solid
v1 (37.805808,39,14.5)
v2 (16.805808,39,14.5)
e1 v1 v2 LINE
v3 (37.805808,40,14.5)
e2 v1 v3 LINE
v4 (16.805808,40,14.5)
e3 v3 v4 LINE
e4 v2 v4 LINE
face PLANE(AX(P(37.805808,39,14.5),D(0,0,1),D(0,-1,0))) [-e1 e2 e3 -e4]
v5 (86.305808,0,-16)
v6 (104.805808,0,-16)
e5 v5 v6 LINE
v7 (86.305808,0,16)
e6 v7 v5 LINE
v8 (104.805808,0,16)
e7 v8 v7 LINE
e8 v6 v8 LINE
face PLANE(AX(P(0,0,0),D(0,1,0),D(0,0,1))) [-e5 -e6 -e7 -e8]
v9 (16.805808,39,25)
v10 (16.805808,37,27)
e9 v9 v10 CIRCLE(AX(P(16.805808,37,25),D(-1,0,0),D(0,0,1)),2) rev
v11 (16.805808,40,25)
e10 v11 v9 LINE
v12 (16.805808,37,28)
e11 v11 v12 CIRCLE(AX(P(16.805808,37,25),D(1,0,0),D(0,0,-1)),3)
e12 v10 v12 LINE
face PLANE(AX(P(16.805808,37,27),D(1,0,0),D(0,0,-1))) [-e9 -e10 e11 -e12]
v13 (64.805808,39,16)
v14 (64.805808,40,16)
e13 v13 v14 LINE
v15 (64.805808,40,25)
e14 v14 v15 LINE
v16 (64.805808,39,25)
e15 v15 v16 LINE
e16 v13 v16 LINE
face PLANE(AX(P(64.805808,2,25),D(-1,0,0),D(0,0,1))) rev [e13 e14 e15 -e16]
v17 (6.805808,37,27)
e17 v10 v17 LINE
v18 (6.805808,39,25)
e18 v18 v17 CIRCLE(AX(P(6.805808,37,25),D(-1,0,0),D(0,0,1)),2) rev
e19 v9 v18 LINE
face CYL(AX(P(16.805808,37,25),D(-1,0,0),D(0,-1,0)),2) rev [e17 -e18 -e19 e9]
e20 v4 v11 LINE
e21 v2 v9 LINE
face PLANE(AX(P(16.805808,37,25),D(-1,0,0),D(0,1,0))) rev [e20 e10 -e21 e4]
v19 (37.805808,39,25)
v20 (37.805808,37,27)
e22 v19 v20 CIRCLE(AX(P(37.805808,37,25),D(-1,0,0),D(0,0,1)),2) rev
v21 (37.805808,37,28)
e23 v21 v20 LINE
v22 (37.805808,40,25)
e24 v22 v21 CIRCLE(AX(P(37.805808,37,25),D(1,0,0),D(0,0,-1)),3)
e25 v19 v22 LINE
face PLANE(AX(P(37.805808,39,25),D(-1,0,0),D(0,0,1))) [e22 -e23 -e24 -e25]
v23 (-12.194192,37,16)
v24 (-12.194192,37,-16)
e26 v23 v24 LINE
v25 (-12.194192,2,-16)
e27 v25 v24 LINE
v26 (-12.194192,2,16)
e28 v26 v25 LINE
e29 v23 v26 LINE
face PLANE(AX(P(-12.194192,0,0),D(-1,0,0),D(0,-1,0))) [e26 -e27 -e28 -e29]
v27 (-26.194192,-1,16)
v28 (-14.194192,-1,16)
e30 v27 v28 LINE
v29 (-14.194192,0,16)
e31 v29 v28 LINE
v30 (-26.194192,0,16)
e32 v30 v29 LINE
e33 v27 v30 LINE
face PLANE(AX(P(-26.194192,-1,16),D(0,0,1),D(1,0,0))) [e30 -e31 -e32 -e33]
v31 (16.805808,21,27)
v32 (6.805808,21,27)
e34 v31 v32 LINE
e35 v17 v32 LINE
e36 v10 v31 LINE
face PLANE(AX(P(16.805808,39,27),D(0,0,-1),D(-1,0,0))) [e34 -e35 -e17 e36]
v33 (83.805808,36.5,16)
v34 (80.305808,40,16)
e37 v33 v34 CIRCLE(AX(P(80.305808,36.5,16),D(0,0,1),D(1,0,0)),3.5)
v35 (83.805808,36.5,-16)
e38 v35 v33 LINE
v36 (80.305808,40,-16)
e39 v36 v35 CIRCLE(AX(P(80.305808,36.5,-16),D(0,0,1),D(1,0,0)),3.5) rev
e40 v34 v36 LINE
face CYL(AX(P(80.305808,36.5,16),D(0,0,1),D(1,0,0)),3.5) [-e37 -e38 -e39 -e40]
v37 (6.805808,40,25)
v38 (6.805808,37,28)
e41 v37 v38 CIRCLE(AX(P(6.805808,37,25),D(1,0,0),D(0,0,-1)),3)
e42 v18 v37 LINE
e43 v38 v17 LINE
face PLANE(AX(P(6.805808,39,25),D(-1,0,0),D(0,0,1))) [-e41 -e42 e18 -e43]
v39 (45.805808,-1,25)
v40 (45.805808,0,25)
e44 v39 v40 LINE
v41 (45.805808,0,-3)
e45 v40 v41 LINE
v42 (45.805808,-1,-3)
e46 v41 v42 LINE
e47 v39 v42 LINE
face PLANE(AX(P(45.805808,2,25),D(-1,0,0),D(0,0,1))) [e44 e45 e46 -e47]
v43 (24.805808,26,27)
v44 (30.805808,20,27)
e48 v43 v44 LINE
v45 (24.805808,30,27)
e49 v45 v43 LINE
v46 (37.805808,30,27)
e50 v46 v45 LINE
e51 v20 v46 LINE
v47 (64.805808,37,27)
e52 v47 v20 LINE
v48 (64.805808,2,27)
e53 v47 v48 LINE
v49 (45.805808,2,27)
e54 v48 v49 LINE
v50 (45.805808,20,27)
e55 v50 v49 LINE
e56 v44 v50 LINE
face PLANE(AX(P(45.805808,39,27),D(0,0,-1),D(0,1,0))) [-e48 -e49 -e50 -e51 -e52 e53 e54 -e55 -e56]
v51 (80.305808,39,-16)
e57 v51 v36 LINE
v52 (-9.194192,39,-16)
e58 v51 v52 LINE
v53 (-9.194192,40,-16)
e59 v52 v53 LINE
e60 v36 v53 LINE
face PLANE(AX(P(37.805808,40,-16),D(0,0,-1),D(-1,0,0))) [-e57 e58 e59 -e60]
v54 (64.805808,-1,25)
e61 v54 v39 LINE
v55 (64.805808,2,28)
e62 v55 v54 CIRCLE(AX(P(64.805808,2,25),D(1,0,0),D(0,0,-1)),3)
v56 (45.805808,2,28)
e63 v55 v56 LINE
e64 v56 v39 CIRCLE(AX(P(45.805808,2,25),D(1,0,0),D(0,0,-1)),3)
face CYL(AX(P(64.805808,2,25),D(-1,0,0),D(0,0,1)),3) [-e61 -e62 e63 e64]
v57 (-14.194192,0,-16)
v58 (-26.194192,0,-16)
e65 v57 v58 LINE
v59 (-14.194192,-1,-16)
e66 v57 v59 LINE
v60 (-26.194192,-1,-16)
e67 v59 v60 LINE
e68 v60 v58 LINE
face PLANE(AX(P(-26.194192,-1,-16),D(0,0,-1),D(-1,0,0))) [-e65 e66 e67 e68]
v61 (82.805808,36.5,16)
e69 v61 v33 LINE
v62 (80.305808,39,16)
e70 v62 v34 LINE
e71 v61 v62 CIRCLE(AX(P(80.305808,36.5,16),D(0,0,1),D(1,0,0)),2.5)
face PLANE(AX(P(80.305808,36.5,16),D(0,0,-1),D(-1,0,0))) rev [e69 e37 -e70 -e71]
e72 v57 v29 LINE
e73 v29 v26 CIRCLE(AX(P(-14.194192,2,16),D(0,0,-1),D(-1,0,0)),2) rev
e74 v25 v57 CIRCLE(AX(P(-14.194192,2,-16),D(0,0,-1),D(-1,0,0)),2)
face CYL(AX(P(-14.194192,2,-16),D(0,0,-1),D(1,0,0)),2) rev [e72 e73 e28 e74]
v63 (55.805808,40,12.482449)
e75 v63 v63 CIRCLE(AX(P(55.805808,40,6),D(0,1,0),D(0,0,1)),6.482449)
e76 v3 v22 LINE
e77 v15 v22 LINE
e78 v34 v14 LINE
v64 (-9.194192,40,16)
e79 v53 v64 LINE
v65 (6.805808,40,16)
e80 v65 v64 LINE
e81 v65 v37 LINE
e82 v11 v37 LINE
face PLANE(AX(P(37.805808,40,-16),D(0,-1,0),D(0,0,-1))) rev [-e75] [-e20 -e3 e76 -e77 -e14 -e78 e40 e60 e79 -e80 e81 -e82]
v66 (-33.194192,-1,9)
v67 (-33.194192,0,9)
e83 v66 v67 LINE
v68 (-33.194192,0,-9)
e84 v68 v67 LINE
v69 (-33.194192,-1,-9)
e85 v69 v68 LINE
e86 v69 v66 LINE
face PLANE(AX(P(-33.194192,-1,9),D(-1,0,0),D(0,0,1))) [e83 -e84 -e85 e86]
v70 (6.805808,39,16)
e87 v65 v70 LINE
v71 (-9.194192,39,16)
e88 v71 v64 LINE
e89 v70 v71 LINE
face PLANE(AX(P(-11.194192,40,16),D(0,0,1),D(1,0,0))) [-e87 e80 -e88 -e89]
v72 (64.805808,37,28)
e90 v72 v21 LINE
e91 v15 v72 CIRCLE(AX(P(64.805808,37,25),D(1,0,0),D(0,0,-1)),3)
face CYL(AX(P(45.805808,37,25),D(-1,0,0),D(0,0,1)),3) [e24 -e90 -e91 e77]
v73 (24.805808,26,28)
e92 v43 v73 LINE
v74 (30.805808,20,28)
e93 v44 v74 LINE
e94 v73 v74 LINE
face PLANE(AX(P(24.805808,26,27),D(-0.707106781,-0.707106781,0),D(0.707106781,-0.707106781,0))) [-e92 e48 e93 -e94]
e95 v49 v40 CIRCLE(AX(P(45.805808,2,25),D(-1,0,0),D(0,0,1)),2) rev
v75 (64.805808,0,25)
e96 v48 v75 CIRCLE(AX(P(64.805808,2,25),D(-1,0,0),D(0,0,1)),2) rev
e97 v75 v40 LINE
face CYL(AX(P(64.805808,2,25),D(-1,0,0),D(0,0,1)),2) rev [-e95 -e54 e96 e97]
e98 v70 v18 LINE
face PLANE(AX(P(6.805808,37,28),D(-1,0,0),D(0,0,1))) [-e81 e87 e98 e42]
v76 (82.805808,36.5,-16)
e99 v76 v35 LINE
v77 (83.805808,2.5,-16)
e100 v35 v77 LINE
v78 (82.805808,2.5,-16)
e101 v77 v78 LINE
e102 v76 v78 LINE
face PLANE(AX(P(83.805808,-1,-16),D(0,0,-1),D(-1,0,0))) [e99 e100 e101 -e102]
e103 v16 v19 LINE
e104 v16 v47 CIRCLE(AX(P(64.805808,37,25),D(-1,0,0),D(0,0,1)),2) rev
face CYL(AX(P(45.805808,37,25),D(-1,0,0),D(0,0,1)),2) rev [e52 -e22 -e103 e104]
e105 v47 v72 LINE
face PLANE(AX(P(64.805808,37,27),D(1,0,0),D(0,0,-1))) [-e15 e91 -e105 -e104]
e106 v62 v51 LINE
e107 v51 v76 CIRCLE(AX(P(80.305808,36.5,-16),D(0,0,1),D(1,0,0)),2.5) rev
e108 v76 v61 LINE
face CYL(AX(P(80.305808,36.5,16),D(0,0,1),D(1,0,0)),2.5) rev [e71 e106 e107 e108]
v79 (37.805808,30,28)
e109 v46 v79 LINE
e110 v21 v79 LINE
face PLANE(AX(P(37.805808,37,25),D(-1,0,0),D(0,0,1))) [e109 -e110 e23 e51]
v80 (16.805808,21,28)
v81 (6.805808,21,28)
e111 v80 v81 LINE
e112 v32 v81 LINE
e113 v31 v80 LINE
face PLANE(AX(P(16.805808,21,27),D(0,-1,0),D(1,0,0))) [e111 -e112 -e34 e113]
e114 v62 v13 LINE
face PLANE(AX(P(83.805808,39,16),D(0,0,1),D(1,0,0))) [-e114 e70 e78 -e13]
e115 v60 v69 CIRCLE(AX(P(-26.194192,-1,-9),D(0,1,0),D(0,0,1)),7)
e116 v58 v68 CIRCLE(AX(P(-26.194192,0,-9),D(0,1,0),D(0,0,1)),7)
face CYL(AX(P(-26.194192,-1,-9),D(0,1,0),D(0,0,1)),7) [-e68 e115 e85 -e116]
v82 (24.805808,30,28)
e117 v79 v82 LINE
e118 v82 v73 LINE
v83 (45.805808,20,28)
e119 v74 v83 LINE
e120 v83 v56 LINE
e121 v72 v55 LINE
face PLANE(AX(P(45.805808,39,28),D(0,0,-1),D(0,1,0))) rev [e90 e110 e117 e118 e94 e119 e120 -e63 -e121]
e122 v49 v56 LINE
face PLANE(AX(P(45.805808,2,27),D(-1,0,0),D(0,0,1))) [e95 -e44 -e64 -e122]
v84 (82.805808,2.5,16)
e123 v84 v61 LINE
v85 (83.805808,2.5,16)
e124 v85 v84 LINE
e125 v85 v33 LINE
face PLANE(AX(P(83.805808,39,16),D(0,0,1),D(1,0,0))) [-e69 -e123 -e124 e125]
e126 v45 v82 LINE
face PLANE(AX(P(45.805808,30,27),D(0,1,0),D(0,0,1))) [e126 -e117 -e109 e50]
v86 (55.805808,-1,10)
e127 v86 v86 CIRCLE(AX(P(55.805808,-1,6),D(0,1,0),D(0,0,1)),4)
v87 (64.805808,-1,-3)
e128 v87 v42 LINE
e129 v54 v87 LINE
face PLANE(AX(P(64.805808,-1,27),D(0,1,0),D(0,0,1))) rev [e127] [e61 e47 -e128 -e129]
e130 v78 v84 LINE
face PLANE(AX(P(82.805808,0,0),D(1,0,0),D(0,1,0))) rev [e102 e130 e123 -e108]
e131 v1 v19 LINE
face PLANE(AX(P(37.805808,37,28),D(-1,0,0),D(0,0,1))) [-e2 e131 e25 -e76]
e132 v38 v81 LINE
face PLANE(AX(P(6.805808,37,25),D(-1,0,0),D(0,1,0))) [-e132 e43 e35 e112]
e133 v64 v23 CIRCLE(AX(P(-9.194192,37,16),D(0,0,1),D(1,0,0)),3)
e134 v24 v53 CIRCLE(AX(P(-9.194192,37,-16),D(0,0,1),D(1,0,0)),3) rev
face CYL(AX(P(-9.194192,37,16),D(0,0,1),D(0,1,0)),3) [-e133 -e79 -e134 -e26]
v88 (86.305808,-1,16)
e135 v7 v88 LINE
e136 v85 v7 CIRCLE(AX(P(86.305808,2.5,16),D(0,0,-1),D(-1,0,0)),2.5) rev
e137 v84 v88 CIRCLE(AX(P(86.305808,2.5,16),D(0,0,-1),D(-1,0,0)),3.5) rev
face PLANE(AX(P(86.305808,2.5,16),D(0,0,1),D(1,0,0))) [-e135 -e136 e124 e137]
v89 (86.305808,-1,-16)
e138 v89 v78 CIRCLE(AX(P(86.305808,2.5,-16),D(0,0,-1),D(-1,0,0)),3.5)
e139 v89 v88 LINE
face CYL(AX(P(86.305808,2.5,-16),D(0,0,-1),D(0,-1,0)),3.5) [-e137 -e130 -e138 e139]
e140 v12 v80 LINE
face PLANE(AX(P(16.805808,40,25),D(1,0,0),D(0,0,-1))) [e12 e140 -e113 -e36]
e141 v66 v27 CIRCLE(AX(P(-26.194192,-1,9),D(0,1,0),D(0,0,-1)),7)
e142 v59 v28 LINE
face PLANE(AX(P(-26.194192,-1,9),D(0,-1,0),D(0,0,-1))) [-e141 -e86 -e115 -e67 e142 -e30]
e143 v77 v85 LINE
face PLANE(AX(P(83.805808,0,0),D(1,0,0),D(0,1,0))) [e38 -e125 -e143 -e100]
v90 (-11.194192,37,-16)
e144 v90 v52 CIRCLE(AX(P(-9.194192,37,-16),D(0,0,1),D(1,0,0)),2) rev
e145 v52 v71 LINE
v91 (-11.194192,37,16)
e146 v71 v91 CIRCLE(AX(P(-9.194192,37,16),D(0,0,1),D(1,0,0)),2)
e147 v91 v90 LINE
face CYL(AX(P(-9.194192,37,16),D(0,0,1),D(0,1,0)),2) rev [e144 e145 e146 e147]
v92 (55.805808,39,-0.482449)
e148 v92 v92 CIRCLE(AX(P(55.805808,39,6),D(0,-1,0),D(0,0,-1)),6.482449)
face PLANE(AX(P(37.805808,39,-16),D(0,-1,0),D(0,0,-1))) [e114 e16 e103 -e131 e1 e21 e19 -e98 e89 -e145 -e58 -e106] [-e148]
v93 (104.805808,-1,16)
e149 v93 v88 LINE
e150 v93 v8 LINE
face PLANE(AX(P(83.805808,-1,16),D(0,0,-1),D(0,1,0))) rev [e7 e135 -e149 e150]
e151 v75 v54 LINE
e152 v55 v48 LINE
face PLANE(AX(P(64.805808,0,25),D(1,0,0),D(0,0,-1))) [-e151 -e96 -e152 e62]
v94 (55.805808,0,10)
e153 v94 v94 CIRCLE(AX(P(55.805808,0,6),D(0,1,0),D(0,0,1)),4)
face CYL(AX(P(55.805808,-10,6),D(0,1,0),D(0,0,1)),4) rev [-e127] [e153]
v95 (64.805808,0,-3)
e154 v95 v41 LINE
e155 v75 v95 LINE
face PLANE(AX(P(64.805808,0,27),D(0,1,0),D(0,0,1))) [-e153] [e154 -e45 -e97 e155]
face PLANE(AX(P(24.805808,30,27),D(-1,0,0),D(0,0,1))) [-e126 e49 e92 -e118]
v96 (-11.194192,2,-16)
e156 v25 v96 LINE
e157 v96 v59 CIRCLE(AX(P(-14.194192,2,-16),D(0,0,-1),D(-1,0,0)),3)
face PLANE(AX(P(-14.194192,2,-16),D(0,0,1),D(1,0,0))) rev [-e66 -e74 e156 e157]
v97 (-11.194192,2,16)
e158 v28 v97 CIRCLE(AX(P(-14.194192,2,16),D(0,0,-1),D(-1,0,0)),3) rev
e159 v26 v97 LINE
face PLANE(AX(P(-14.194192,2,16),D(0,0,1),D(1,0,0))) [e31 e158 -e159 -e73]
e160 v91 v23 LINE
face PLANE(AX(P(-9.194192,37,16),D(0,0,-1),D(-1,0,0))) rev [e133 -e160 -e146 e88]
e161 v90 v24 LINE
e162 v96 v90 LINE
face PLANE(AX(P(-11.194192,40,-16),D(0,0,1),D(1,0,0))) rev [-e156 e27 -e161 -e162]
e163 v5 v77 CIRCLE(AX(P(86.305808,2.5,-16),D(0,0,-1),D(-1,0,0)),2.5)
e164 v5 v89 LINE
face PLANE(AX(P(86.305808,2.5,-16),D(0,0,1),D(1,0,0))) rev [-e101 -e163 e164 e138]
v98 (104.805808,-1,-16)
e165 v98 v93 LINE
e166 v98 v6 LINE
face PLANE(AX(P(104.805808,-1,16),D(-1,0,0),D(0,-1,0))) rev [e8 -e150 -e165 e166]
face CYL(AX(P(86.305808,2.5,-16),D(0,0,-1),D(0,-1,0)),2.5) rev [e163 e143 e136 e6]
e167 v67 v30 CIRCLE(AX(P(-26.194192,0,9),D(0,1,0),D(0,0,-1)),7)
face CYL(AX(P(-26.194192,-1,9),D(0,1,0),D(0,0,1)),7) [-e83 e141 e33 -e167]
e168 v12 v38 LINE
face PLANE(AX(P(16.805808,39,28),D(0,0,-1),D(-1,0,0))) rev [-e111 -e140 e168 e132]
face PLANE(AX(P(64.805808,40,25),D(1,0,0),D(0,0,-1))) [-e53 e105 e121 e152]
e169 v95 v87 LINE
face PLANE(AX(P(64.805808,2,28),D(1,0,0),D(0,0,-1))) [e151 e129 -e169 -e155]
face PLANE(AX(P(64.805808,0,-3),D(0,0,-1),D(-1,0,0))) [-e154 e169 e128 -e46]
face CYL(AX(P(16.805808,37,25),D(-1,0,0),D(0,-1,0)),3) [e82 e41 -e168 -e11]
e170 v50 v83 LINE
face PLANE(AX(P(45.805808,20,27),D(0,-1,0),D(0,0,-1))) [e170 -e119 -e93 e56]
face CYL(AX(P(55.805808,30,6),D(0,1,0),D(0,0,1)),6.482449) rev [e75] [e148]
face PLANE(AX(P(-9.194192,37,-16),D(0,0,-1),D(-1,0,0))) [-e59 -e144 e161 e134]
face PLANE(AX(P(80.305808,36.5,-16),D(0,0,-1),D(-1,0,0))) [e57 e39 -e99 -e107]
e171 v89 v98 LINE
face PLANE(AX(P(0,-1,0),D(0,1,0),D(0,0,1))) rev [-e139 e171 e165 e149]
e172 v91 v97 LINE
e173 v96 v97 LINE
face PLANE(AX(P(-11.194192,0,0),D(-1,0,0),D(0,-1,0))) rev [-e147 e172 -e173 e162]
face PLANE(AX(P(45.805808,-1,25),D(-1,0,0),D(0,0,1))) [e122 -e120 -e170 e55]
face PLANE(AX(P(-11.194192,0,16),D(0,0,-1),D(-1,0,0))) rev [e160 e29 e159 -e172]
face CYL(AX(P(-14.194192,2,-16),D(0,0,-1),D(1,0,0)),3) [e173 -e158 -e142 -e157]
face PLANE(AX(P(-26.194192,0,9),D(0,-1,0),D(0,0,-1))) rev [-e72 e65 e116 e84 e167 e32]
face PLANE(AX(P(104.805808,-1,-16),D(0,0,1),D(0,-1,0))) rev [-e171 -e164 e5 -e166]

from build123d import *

# Parameters (mm, degrees)
BASE_FLANGE1_DEPTH           = 1
EDGE_FLANGE2_STRIP_W         = 8
EDGE_FLANGE2_STRIP_H         = 1
EDGE_FLANGE2_STRIP_CUT_DEPTH = 32
EDGE_FLANGE2_DEPTH           = 32
EDGE_FLANGE3_STRIP_W         = 8
EDGE_FLANGE3_STRIP_H         = 1
EDGE_FLANGE3_STRIP_CUT_DEPTH = 32
EDGE_FLANGE3_DEPTH           = 32
BASE_FLANGE2_DEPTH           = 10
SKETCH28_W                   = 30.5
SKETCH28_H                   = 1
BASE_FLANGE3_DEPTH           = 21
BASE_FLANGE4_DEPTH           = 8
TAB1_DEPTH                   = 1
BASE_FLANGE5_DEPTH           = 19
SKETCH41_W                   = 32
SKETCH41_H                   = 1
BASE_FLANGE6_DEPTH           = 19
EDGE_FLANGE4_STRIP_W         = 9
EDGE_FLANGE4_STRIP_H         = 1
EDGE_FLANGE4_STRIP_CUT_DEPTH = 32
EDGE_FLANGE4_DEPTH           = 32
EDGE_FLANGE5_STRIP_W         = 9
EDGE_FLANGE5_STRIP_H         = 1
EDGE_FLANGE5_STRIP_CUT_DEPTH = 32
EDGE_FLANGE5_DEPTH           = 32
SKETCH52_R                   = 6.482448702
CUT_EXTRUDE1_DEPTH           = 10
SKETCH53_R                   = 4
CUT_EXTRUDE2_DEPTH           = 10


# Read off the part's stored shape, not the designer's step: Base-Flange2
# Sheet-metal steps are written as plain solids
with BuildPart() as part:
    # Sketch1 → Base-Flange1 (new body)
    with BuildSketch(Plane(origin=(0, 0, 0), x_dir=(1, 0, 0), z_dir=(0, 1, 0))):
        with BuildLine():
            Line((-33.194191811, -9), (-33.194191811, 9))
            ThreePointArc((-33.194191811, 9), (-31.14393928, 13.949747468), (-26.194191811, 16))
            Line((-26.194191811, 16), (-11.194191811, 16))
            Line((-11.194191811, 16), (-11.194191811, -16))
            Line((-11.194191811, -16), (-26.194191811, -16))
            ThreePointArc((-26.194191811, -16), (-31.14393928, -13.949747468), (-33.194191811, -9))
        make_face()
    extrude(amount=-BASE_FLANGE1_DEPTH)

    # Edge-Flange2 strip (across the edge) → Edge-Flange2 strip cut (cut)
    with BuildSketch(Plane(origin=(-11.194191811, 0, 16), x_dir=(-1, 0, 0), z_dir=(0, 0, -1))):
        with Locations((-1, -0.5)):
            Rectangle(EDGE_FLANGE2_STRIP_W, EDGE_FLANGE2_STRIP_H)
    extrude(amount=EDGE_FLANGE2_STRIP_CUT_DEPTH, mode=Mode.SUBTRACT)

    # Edge-Flange2 section (across the edge) → Edge-Flange2 (add)
    with BuildSketch(Plane(origin=(-11.194191811, 0, 16), x_dir=(-1, 0, 0), z_dir=(0, 0, -1))):
        with BuildLine():
            Line((0, 2), (0, 40))
            Line((0, 40), (1, 40))
            Line((1, 40), (1, 2))
            ThreePointArc((1, 2), (1.585786438, 0.585786438), (3, 0))
            Line((3, 0), (3, -1))
            ThreePointArc((3, -1), (0.878679656, -0.121320344), (0, 2))
        make_face()
    extrude(amount=EDGE_FLANGE2_DEPTH)

    # Edge-Flange3 strip (across the edge) → Edge-Flange3 strip cut (cut)
    with BuildSketch(Plane(origin=(-11.194191811, 40, -16), x_dir=(0, -1, 0), z_dir=(0, 0, 1))):
        with Locations((-1, -0.5)):
            Rectangle(EDGE_FLANGE3_STRIP_W, EDGE_FLANGE3_STRIP_H)
    extrude(amount=EDGE_FLANGE3_STRIP_CUT_DEPTH, mode=Mode.SUBTRACT)

    # Edge-Flange3 section (across the edge) → Edge-Flange3 (add)
    with BuildSketch(Plane(origin=(-11.194191811, 40, -16), x_dir=(0, -1, 0), z_dir=(0, 0, 1))):
        with BuildLine():
            Line((0, 2), (0, 18))
            Line((0, 18), (1, 18))
            Line((1, 18), (1, 2))
            ThreePointArc((1, 2), (1.585786438, 0.585786438), (3, 0))
            Line((3, 0), (3, -1))
            ThreePointArc((3, -1), (0.878679656, -0.121320344), (0, 2))
        make_face()
    extrude(amount=EDGE_FLANGE3_DEPTH)


with BuildPart() as body_2:
    # Base-Flange2 outline → Base-Flange2 (new body)
    with BuildSketch(Plane(origin=(6.805808189, 0, 0), x_dir=(0, 0, -1), z_dir=(1, 0, 0))):
        with BuildLine():
            Line((-28, 37), (-28, 21))
            Line((-28, 21), (-27, 21))
            Line((-27, 21), (-27, 37))
            ThreePointArc((-27, 37), (-26.414213562, 38.414213562), (-25, 39))
            Line((-25, 39), (16, 39))
            Line((16, 39), (16, 40))
            Line((16, 40), (-25, 40))
            ThreePointArc((-25, 40), (-27.121320344, 39.121320344), (-28, 37))
        make_face()
    extrude(amount=BASE_FLANGE2_DEPTH)


with BuildPart() as part_1:
    add(part.part)

    # Combine1: union body 2
    add(body_2.part)


with BuildPart() as body_2_2:
    # Sketch28 → Base-Flange3 (new body)
    with BuildSketch(Plane(origin=(16.805808189, 0, 0), x_dir=(0, 0, -1), z_dir=(1, 0, 0))):
        with Locations((0.75, 39.5)):
            Rectangle(SKETCH28_W, SKETCH28_H)
    extrude(amount=BASE_FLANGE3_DEPTH)


with BuildPart() as body_3:
    # Sketch31 → Base-Flange4 (new body)
    with BuildSketch(Plane(origin=(37.805808189, 0, 0), x_dir=(0, 0, -1), z_dir=(1, 0, 0))):
        with BuildLine():
            Line((16, 39), (-25, 39))
            ThreePointArc((-25, 39), (-26.414213562, 38.414213562), (-27, 37))
            Line((-27, 37), (-27, 30))
            Line((-27, 30), (-28, 30))
            Line((-28, 30), (-28, 37))
            ThreePointArc((-28, 37), (-27.121320344, 39.121320344), (-25, 40))
            Line((-25, 40), (16, 40))
            Line((16, 40), (16, 39))
        make_face()
    extrude(amount=BASE_FLANGE4_DEPTH)

    # Sketch34 → Tab1 (add)
    with BuildSketch(Plane.XY.offset(28)):
        Polygon((45.805808189, 30), (24.805808189, 30), (24.805808189, 26), (30.805808189, 20), (45.805808189, 20), align=None)
    extrude(amount=-TAB1_DEPTH)


with BuildPart() as body_4:
    # Sketch38 → Base-Flange5 (new body)
    with BuildSketch(Plane(origin=(45.805808189, 0, 0), x_dir=(0, 0, -1), z_dir=(1, 0, 0))):
        with BuildLine():
            Line((16, 39), (-25, 39))
            ThreePointArc((-25, 39), (-26.414213562, 38.414213562), (-27, 37))
            Line((-27, 37), (-27, 2))
            ThreePointArc((-27, 2), (-26.414213562, 0.585786438), (-25, 0))
            Line((-25, 0), (3, 0))
            Line((3, 0), (3, -1))
            Line((3, -1), (-25, -1))
            ThreePointArc((-25, -1), (-27.121320344, -0.121320344), (-28, 2))
            Line((-28, 2), (-28, 37))
            ThreePointArc((-28, 37), (-27.121320344, 39.121320344), (-25, 40))
            Line((-25, 40), (16, 40))
            Line((16, 40), (16, 39))
        make_face()
    extrude(amount=BASE_FLANGE5_DEPTH)


with BuildPart() as body_5:
    # Sketch41 → Base-Flange6 (new body)
    with BuildSketch(Plane(origin=(64.805808189, 0, 0), x_dir=(0, 0, -1), z_dir=(1, 0, 0))):
        with Locations((0, 39.5)):
            Rectangle(SKETCH41_W, SKETCH41_H)
    extrude(amount=BASE_FLANGE6_DEPTH)

    # Edge-Flange4 strip (across the edge) → Edge-Flange4 strip cut (cut)
    with BuildSketch(Plane(origin=(83.805808189, 39, -16), x_dir=(-1, 0, 0), z_dir=(0, 0, 1))):
        with Locations((-1, -0.5)):
            Rectangle(EDGE_FLANGE4_STRIP_W, EDGE_FLANGE4_STRIP_H)
    extrude(amount=EDGE_FLANGE4_STRIP_CUT_DEPTH, mode=Mode.SUBTRACT)

    # Edge-Flange4 section (across the edge) → Edge-Flange4 (add)
    with BuildSketch(Plane(origin=(83.805808189, 39, -16), x_dir=(-1, 0, 0), z_dir=(0, 0, 1))):
        with BuildLine():
            Line((0, 2.5), (0, 40))
            Line((0, 40), (1, 40))
            Line((1, 40), (1, 2.5))
            ThreePointArc((1, 2.5), (1.732233047, 0.732233047), (3.5, 0))
            Line((3.5, 0), (3.5, -1))
            ThreePointArc((3.5, -1), (1.025126266, 0.025126266), (0, 2.5))
        make_face()
    extrude(amount=EDGE_FLANGE4_DEPTH)

    # Edge-Flange5 strip (across the edge) → Edge-Flange5 strip cut (cut)
    with BuildSketch(Plane(origin=(83.805808189, -1, 16), x_dir=(0, 1, 0), z_dir=(0, 0, -1))):
        with Locations((-1, -0.5)):
            Rectangle(EDGE_FLANGE5_STRIP_W, EDGE_FLANGE5_STRIP_H)
    extrude(amount=EDGE_FLANGE5_STRIP_CUT_DEPTH, mode=Mode.SUBTRACT)

    # Edge-Flange5 section (across the edge) → Edge-Flange5 (add)
    with BuildSketch(Plane(origin=(83.805808189, -1, 16), x_dir=(0, 1, 0), z_dir=(0, 0, -1))):
        with BuildLine():
            Line((0, 2.5), (0, 21))
            Line((0, 21), (1, 21))
            Line((1, 21), (1, 2.5))
            ThreePointArc((1, 2.5), (1.732233047, 0.732233047), (3.5, 0))
            Line((3.5, 0), (3.5, -1))
            ThreePointArc((3.5, -1), (1.025126266, 0.025126266), (0, 2.5))
        make_face()
    extrude(amount=EDGE_FLANGE5_DEPTH)


with BuildPart() as body_2_2_1:
    add(body_2_2.part)

    # Combine2: union body 3, body 4, body 5, part
    add(body_3.part)
    add(body_4.part)
    add(body_5.part)
    add(part_1.part)

    # Sketch52 → Cut-Extrude1 (cut)
    with BuildSketch(Plane(origin=(0, 40, 0), x_dir=(1, 0, 0), z_dir=(0, 1, 0))):
        with Locations(Location((55.805808189, -6, 0), (0, 0, 270))):
            Circle(SKETCH52_R)
    extrude(amount=-CUT_EXTRUDE1_DEPTH, mode=Mode.SUBTRACT)

    # Sketch53 → Cut-Extrude2 (cut)
    with BuildSketch(Plane(origin=(0, 0, 0), x_dir=(1, 0, 0), z_dir=(0, 1, 0))):
        with Locations(Location((55.805808189, -6, 0), (0, 0, 270))):
            Circle(SKETCH53_R)
    extrude(amount=-CUT_EXTRUDE2_DEPTH, mode=Mode.SUBTRACT)


solid = body_2_2_1.part
